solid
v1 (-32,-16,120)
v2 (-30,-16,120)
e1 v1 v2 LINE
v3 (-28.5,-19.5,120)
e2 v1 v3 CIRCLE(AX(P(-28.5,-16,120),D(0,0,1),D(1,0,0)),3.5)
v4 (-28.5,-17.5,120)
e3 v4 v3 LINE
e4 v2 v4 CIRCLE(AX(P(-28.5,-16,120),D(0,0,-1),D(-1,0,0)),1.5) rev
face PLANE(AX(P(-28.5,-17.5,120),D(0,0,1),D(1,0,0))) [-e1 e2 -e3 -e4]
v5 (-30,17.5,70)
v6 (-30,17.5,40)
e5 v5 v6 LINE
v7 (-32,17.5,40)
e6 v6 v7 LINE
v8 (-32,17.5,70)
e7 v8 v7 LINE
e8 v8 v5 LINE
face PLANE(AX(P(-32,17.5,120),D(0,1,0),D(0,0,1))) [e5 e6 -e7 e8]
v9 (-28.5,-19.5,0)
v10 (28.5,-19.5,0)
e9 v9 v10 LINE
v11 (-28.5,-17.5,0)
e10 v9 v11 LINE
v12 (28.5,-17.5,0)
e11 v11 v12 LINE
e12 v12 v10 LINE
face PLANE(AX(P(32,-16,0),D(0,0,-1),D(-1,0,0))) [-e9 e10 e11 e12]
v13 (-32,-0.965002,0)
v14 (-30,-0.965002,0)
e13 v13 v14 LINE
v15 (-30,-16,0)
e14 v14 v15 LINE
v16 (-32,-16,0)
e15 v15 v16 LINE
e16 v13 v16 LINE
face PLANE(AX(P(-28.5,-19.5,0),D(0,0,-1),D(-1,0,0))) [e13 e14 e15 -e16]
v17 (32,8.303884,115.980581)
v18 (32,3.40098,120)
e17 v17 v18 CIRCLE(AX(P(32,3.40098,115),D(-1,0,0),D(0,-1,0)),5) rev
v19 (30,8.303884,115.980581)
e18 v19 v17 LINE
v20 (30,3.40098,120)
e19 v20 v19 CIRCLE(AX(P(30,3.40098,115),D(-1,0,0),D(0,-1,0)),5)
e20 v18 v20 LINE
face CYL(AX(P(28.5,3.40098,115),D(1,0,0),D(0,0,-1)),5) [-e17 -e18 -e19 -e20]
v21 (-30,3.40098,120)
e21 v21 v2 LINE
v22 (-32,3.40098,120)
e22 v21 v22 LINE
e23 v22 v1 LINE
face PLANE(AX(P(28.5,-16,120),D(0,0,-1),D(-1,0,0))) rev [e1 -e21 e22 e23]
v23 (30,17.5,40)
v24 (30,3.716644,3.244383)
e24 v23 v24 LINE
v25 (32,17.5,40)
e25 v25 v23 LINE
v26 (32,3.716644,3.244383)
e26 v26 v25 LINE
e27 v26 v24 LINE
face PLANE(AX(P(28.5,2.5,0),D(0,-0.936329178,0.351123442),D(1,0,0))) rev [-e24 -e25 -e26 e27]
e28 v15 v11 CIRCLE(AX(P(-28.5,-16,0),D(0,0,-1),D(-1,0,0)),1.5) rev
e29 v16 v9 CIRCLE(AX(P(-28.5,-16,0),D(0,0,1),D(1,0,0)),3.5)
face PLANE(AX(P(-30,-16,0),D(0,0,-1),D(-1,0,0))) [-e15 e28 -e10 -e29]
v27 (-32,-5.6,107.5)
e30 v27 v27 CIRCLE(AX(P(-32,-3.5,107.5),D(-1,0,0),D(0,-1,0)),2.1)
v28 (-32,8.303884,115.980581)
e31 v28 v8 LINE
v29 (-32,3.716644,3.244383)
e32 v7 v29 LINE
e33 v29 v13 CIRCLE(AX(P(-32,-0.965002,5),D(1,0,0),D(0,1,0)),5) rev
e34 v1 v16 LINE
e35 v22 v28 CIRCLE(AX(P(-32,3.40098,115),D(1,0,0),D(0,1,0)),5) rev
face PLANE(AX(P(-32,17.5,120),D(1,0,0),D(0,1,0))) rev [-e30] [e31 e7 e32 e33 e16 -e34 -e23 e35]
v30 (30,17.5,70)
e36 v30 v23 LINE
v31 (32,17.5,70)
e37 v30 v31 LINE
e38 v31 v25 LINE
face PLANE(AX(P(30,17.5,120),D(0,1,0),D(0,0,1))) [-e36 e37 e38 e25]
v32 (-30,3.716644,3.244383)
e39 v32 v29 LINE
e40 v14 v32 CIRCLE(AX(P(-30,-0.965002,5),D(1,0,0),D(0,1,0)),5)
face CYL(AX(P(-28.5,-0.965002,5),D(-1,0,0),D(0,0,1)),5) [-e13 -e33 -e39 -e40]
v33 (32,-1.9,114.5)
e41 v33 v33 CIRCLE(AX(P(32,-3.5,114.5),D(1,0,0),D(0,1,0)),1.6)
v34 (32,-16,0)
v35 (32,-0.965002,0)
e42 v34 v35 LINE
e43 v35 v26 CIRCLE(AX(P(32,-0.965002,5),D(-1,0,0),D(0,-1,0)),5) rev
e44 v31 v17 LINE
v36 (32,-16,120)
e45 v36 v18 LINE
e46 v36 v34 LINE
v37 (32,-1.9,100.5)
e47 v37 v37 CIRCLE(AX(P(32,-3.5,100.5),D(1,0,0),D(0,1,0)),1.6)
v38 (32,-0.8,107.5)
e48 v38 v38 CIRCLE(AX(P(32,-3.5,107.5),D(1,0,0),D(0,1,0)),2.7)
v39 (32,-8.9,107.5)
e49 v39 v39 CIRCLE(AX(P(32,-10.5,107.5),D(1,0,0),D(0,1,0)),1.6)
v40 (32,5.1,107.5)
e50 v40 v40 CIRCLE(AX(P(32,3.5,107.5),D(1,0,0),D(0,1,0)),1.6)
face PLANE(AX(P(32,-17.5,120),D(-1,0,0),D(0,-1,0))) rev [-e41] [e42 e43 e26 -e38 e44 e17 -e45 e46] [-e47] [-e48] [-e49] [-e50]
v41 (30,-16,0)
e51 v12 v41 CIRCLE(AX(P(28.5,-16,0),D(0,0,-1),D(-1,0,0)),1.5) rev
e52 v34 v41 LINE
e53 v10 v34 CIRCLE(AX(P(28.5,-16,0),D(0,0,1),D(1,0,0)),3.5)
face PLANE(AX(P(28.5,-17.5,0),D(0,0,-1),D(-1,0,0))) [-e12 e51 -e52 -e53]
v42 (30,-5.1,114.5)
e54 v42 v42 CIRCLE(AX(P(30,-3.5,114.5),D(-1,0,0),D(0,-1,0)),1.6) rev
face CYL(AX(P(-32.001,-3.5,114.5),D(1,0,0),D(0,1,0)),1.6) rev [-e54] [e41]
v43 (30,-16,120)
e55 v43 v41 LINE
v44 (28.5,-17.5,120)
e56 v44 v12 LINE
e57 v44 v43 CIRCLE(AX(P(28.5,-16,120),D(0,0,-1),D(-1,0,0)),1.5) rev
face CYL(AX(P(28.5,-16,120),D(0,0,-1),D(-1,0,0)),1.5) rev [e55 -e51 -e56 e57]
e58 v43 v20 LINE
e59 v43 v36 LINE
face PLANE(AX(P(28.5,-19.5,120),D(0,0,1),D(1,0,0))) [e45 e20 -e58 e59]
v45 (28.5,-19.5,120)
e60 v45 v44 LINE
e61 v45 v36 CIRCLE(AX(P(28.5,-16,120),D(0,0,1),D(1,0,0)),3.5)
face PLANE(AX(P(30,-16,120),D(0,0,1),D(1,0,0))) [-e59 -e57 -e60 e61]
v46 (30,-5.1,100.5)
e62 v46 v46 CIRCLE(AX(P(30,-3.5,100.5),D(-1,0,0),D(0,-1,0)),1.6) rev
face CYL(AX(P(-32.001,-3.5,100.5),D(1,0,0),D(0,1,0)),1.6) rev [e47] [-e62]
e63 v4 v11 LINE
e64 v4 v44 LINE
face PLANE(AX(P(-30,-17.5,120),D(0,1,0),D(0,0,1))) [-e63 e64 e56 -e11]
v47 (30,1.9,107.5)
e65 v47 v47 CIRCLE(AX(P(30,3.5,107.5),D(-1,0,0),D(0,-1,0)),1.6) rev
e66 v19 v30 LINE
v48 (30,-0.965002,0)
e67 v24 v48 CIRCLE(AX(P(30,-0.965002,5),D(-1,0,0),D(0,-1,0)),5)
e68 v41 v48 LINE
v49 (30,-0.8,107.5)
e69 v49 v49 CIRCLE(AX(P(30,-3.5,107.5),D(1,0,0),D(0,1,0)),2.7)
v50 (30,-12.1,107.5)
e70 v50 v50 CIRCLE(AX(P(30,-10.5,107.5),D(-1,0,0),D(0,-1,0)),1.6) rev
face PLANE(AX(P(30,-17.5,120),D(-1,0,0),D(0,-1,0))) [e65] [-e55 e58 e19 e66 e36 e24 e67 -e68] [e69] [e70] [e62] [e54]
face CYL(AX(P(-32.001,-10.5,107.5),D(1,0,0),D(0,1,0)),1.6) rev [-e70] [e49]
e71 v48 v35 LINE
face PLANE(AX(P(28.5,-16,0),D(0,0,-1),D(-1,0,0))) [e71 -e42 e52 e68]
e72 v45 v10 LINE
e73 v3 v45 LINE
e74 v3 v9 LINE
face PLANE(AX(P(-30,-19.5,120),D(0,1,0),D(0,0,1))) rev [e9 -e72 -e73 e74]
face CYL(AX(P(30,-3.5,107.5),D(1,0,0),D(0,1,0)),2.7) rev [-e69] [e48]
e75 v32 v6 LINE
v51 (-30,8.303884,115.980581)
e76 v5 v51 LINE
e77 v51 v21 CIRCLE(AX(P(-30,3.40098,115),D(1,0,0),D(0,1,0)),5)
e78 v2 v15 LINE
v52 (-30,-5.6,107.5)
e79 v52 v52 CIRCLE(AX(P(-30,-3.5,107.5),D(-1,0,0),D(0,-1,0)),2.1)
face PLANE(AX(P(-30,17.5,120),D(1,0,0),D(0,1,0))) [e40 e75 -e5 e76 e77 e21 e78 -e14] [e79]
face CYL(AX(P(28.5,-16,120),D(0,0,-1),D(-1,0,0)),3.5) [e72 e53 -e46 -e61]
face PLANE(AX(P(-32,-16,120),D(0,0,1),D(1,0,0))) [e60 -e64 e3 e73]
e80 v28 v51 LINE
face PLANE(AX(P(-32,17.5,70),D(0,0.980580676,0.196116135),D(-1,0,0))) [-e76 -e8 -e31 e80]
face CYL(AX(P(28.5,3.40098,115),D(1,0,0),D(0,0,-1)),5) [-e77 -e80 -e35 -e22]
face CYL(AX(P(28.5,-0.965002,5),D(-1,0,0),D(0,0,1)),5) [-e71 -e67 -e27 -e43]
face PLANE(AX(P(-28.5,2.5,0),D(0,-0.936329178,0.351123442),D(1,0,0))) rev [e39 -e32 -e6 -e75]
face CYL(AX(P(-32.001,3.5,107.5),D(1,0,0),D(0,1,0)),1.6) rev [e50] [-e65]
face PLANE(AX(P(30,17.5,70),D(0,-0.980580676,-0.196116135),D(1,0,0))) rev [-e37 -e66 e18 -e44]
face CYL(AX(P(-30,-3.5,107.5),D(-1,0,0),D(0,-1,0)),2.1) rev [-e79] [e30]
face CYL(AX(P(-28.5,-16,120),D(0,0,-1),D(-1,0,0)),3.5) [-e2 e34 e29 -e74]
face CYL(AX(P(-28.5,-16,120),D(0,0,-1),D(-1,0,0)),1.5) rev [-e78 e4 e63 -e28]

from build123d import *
from OCP.BRepFilletAPI import BRepFilletAPI_MakeChamfer

# Parameters (mm, degrees)
SM_BASE_FLANGE_1_DEPTH = 120
CUT_EXTRUDE_1_REACH    = 139.391
SKETCH_6_R             = 1.6
CHAMFER_1_SIZE         = 10
CHAMFER_1_SIZE2        = 50
SKETCH_7_R             = 2.7
CUT_EXTRUDE_2_DEPTH    = 2
SKETCH_9_R             = 2.1
CUT_EXTRUDE_3_DEPTH    = 2
CHAMFER_2_SIZE         = 40
CHAMFER_2_SIZE2        = 15
FILLET_1_R             = 5


# Sheet-metal steps are written as plain solids
with BuildPart() as part:
    # Sketch 1 → 基材-凸緣1 (new body)
    with BuildSketch(Plane.XY):
        with BuildLine():
            Line((-30, 17.5), (-30, -16))
            ThreePointArc((-30, -16), (-29.560660172, -17.060660172), (-28.5, -17.5))
            Line((-28.5, -17.5), (28.5, -17.5))
            ThreePointArc((28.5, -17.5), (29.560660172, -17.060660172), (30, -16))
            Line((30, -16), (30, 17.5))
            Line((30, 17.5), (32, 17.5))
            Line((32, 17.5), (32, -16))
            ThreePointArc((32, -16), (30.974873734, -18.474873734), (28.5, -19.5))
            Line((28.5, -19.5), (-28.5, -19.5))
            ThreePointArc((-28.5, -19.5), (-30.974873734, -18.474873734), (-32, -16))
            Line((-32, -16), (-32, 17.5))
            Line((-32, 17.5), (-30, 17.5))
        make_face()
    extrude(amount=SM_BASE_FLANGE_1_DEPTH)

    # 草圖6 → 除料-伸長1 (cut, up to next)
    with BuildSketch(Plane(origin=(32, 0, 0), x_dir=(0, 0, -1), z_dir=(1, 0, 0)), mode=Mode.PRIVATE) as cut_extrude_1_sk1:
        with Locations(Location((-107.5, 3.5, 0), (0, 0, 90))):
            Circle(SKETCH_6_R)
    cut_extrude_1_tool1 = extrude(cut_extrude_1_sk1.sketch, amount=-CUT_EXTRUDE_1_REACH, mode=Mode.PRIVATE) & part.part
    # 草圖6 → 除料-伸長1 (cut, up to next)
    with BuildSketch(Plane(origin=(32, 0, 0), x_dir=(0, 0, -1), z_dir=(1, 0, 0)), mode=Mode.PRIVATE) as cut_extrude_1_sk2:
        with Locations(Location((-100.5, -3.5, 0), (0, 0, 90))):
            Circle(SKETCH_6_R)
    cut_extrude_1_tool2 = extrude(cut_extrude_1_sk2.sketch, amount=-CUT_EXTRUDE_1_REACH, mode=Mode.PRIVATE) & part.part
    # 草圖6 → 除料-伸長1 (cut, up to next)
    with BuildSketch(Plane(origin=(32, 0, 0), x_dir=(0, 0, -1), z_dir=(1, 0, 0)), mode=Mode.PRIVATE) as cut_extrude_1_sk3:
        with Locations(Location((-107.5, -10.5, 0), (0, 0, 90))):
            Circle(SKETCH_6_R)
    cut_extrude_1_tool3 = extrude(cut_extrude_1_sk3.sketch, amount=-CUT_EXTRUDE_1_REACH, mode=Mode.PRIVATE) & part.part
    # 草圖6 → 除料-伸長1 (cut, up to next)
    with BuildSketch(Plane(origin=(32, 0, 0), x_dir=(0, 0, -1), z_dir=(1, 0, 0)), mode=Mode.PRIVATE) as cut_extrude_1_sk4:
        with Locations(Location((-114.5, -3.5, 0), (0, 0, 90))):
            Circle(SKETCH_6_R)
    cut_extrude_1_tool4 = extrude(cut_extrude_1_sk4.sketch, amount=-CUT_EXTRUDE_1_REACH, mode=Mode.PRIVATE) & part.part
    add(cut_extrude_1_tool1.solids().sort_by_distance((32, 3.5, 107.5))[0], mode=Mode.SUBTRACT)
    add(cut_extrude_1_tool2.solids().sort_by_distance((32, -3.5, 100.5))[0], mode=Mode.SUBTRACT)
    add(cut_extrude_1_tool3.solids().sort_by_distance((32, -10.5, 107.5))[0], mode=Mode.SUBTRACT)
    add(cut_extrude_1_tool4.solids().sort_by_distance((32, -3.5, 114.5))[0], mode=Mode.SUBTRACT)

    # 導角1
    chamfer_1_edges = [part.edges().sort_by_distance(p)[0] for p in [
        (-31, 17.5, 120),
        (31, 17.5, 120),
    ]]
    chamfer_1_side = [part.faces().sort_by_distance(p)[0] for p in [
        (-30.452140533, -17.952140533, 120),
    ]]
    chamfer(chamfer_1_edges, length=CHAMFER_1_SIZE, length2=CHAMFER_1_SIZE2, reference=chamfer_1_side[0])

    # 草圖7 → 除料-伸長2 (cut)
    with BuildSketch(Plane(origin=(32, 0, 0), x_dir=(0, 0, -1), z_dir=(1, 0, 0))):
        with Locations(Location((-107.5, -3.5, 0), (0, 0, 90))):
            Circle(SKETCH_7_R)
    extrude(amount=-CUT_EXTRUDE_2_DEPTH, mode=Mode.SUBTRACT)

    # 草圖9 → 除料-伸長3 (cut)
    with BuildSketch(Plane.ZY.offset(32)):
        with Locations(Location((107.5, -3.5, 0), (0, 0, 270))):
            Circle(SKETCH_9_R)
    extrude(amount=-CUT_EXTRUDE_3_DEPTH, mode=Mode.SUBTRACT)

    # 導角2: one chamfer whose edges measure the first distance from different faces: ONE call of the kernel's chamfer builder (chamfer() names one face for all edges)
    chamfer_2_edges_1 = [part.edges().sort_by_distance(p)[0] for p in [
        (-31, 17.5, 0),
    ]]
    chamfer_2_side_1 = [part.faces().sort_by_distance(p)[0] for p in [
        (-31, 17.5, 35),
    ]]
    chamfer_2_edges_2 = [part.edges().sort_by_distance(p)[0] for p in [
        (31, 17.5, 0),
    ]]
    chamfer_2_side_2 = [part.faces().sort_by_distance(p)[0] for p in [
        (31, 17.5, 35),
    ]]
    chamfer_2 = BRepFilletAPI_MakeChamfer(part.part.solid().wrapped)
    for e in chamfer_2_edges_1:
        chamfer_2.Add(CHAMFER_2_SIZE, CHAMFER_2_SIZE2, e.wrapped, chamfer_2_side_1[0].wrapped)  # the first distance lies on this face
    for e in chamfer_2_edges_2:
        chamfer_2.Add(CHAMFER_2_SIZE, CHAMFER_2_SIZE2, e.wrapped, chamfer_2_side_2[0].wrapped)  # the first distance lies on this face
    add(Compound.cast(chamfer_2.Shape()), mode=Mode.REPLACE)

    # 圓角1
    fillet_1_edges = [part.edges().sort_by_distance(p)[0] for p in [
        (-31, 2.5, 0),
        (31, 2.5, 0),
        (-31, 7.5, 120),
        (31, 7.5, 120),
    ]]
    fillet(fillet_1_edges, radius=FILLET_1_R)


solid = part.part
